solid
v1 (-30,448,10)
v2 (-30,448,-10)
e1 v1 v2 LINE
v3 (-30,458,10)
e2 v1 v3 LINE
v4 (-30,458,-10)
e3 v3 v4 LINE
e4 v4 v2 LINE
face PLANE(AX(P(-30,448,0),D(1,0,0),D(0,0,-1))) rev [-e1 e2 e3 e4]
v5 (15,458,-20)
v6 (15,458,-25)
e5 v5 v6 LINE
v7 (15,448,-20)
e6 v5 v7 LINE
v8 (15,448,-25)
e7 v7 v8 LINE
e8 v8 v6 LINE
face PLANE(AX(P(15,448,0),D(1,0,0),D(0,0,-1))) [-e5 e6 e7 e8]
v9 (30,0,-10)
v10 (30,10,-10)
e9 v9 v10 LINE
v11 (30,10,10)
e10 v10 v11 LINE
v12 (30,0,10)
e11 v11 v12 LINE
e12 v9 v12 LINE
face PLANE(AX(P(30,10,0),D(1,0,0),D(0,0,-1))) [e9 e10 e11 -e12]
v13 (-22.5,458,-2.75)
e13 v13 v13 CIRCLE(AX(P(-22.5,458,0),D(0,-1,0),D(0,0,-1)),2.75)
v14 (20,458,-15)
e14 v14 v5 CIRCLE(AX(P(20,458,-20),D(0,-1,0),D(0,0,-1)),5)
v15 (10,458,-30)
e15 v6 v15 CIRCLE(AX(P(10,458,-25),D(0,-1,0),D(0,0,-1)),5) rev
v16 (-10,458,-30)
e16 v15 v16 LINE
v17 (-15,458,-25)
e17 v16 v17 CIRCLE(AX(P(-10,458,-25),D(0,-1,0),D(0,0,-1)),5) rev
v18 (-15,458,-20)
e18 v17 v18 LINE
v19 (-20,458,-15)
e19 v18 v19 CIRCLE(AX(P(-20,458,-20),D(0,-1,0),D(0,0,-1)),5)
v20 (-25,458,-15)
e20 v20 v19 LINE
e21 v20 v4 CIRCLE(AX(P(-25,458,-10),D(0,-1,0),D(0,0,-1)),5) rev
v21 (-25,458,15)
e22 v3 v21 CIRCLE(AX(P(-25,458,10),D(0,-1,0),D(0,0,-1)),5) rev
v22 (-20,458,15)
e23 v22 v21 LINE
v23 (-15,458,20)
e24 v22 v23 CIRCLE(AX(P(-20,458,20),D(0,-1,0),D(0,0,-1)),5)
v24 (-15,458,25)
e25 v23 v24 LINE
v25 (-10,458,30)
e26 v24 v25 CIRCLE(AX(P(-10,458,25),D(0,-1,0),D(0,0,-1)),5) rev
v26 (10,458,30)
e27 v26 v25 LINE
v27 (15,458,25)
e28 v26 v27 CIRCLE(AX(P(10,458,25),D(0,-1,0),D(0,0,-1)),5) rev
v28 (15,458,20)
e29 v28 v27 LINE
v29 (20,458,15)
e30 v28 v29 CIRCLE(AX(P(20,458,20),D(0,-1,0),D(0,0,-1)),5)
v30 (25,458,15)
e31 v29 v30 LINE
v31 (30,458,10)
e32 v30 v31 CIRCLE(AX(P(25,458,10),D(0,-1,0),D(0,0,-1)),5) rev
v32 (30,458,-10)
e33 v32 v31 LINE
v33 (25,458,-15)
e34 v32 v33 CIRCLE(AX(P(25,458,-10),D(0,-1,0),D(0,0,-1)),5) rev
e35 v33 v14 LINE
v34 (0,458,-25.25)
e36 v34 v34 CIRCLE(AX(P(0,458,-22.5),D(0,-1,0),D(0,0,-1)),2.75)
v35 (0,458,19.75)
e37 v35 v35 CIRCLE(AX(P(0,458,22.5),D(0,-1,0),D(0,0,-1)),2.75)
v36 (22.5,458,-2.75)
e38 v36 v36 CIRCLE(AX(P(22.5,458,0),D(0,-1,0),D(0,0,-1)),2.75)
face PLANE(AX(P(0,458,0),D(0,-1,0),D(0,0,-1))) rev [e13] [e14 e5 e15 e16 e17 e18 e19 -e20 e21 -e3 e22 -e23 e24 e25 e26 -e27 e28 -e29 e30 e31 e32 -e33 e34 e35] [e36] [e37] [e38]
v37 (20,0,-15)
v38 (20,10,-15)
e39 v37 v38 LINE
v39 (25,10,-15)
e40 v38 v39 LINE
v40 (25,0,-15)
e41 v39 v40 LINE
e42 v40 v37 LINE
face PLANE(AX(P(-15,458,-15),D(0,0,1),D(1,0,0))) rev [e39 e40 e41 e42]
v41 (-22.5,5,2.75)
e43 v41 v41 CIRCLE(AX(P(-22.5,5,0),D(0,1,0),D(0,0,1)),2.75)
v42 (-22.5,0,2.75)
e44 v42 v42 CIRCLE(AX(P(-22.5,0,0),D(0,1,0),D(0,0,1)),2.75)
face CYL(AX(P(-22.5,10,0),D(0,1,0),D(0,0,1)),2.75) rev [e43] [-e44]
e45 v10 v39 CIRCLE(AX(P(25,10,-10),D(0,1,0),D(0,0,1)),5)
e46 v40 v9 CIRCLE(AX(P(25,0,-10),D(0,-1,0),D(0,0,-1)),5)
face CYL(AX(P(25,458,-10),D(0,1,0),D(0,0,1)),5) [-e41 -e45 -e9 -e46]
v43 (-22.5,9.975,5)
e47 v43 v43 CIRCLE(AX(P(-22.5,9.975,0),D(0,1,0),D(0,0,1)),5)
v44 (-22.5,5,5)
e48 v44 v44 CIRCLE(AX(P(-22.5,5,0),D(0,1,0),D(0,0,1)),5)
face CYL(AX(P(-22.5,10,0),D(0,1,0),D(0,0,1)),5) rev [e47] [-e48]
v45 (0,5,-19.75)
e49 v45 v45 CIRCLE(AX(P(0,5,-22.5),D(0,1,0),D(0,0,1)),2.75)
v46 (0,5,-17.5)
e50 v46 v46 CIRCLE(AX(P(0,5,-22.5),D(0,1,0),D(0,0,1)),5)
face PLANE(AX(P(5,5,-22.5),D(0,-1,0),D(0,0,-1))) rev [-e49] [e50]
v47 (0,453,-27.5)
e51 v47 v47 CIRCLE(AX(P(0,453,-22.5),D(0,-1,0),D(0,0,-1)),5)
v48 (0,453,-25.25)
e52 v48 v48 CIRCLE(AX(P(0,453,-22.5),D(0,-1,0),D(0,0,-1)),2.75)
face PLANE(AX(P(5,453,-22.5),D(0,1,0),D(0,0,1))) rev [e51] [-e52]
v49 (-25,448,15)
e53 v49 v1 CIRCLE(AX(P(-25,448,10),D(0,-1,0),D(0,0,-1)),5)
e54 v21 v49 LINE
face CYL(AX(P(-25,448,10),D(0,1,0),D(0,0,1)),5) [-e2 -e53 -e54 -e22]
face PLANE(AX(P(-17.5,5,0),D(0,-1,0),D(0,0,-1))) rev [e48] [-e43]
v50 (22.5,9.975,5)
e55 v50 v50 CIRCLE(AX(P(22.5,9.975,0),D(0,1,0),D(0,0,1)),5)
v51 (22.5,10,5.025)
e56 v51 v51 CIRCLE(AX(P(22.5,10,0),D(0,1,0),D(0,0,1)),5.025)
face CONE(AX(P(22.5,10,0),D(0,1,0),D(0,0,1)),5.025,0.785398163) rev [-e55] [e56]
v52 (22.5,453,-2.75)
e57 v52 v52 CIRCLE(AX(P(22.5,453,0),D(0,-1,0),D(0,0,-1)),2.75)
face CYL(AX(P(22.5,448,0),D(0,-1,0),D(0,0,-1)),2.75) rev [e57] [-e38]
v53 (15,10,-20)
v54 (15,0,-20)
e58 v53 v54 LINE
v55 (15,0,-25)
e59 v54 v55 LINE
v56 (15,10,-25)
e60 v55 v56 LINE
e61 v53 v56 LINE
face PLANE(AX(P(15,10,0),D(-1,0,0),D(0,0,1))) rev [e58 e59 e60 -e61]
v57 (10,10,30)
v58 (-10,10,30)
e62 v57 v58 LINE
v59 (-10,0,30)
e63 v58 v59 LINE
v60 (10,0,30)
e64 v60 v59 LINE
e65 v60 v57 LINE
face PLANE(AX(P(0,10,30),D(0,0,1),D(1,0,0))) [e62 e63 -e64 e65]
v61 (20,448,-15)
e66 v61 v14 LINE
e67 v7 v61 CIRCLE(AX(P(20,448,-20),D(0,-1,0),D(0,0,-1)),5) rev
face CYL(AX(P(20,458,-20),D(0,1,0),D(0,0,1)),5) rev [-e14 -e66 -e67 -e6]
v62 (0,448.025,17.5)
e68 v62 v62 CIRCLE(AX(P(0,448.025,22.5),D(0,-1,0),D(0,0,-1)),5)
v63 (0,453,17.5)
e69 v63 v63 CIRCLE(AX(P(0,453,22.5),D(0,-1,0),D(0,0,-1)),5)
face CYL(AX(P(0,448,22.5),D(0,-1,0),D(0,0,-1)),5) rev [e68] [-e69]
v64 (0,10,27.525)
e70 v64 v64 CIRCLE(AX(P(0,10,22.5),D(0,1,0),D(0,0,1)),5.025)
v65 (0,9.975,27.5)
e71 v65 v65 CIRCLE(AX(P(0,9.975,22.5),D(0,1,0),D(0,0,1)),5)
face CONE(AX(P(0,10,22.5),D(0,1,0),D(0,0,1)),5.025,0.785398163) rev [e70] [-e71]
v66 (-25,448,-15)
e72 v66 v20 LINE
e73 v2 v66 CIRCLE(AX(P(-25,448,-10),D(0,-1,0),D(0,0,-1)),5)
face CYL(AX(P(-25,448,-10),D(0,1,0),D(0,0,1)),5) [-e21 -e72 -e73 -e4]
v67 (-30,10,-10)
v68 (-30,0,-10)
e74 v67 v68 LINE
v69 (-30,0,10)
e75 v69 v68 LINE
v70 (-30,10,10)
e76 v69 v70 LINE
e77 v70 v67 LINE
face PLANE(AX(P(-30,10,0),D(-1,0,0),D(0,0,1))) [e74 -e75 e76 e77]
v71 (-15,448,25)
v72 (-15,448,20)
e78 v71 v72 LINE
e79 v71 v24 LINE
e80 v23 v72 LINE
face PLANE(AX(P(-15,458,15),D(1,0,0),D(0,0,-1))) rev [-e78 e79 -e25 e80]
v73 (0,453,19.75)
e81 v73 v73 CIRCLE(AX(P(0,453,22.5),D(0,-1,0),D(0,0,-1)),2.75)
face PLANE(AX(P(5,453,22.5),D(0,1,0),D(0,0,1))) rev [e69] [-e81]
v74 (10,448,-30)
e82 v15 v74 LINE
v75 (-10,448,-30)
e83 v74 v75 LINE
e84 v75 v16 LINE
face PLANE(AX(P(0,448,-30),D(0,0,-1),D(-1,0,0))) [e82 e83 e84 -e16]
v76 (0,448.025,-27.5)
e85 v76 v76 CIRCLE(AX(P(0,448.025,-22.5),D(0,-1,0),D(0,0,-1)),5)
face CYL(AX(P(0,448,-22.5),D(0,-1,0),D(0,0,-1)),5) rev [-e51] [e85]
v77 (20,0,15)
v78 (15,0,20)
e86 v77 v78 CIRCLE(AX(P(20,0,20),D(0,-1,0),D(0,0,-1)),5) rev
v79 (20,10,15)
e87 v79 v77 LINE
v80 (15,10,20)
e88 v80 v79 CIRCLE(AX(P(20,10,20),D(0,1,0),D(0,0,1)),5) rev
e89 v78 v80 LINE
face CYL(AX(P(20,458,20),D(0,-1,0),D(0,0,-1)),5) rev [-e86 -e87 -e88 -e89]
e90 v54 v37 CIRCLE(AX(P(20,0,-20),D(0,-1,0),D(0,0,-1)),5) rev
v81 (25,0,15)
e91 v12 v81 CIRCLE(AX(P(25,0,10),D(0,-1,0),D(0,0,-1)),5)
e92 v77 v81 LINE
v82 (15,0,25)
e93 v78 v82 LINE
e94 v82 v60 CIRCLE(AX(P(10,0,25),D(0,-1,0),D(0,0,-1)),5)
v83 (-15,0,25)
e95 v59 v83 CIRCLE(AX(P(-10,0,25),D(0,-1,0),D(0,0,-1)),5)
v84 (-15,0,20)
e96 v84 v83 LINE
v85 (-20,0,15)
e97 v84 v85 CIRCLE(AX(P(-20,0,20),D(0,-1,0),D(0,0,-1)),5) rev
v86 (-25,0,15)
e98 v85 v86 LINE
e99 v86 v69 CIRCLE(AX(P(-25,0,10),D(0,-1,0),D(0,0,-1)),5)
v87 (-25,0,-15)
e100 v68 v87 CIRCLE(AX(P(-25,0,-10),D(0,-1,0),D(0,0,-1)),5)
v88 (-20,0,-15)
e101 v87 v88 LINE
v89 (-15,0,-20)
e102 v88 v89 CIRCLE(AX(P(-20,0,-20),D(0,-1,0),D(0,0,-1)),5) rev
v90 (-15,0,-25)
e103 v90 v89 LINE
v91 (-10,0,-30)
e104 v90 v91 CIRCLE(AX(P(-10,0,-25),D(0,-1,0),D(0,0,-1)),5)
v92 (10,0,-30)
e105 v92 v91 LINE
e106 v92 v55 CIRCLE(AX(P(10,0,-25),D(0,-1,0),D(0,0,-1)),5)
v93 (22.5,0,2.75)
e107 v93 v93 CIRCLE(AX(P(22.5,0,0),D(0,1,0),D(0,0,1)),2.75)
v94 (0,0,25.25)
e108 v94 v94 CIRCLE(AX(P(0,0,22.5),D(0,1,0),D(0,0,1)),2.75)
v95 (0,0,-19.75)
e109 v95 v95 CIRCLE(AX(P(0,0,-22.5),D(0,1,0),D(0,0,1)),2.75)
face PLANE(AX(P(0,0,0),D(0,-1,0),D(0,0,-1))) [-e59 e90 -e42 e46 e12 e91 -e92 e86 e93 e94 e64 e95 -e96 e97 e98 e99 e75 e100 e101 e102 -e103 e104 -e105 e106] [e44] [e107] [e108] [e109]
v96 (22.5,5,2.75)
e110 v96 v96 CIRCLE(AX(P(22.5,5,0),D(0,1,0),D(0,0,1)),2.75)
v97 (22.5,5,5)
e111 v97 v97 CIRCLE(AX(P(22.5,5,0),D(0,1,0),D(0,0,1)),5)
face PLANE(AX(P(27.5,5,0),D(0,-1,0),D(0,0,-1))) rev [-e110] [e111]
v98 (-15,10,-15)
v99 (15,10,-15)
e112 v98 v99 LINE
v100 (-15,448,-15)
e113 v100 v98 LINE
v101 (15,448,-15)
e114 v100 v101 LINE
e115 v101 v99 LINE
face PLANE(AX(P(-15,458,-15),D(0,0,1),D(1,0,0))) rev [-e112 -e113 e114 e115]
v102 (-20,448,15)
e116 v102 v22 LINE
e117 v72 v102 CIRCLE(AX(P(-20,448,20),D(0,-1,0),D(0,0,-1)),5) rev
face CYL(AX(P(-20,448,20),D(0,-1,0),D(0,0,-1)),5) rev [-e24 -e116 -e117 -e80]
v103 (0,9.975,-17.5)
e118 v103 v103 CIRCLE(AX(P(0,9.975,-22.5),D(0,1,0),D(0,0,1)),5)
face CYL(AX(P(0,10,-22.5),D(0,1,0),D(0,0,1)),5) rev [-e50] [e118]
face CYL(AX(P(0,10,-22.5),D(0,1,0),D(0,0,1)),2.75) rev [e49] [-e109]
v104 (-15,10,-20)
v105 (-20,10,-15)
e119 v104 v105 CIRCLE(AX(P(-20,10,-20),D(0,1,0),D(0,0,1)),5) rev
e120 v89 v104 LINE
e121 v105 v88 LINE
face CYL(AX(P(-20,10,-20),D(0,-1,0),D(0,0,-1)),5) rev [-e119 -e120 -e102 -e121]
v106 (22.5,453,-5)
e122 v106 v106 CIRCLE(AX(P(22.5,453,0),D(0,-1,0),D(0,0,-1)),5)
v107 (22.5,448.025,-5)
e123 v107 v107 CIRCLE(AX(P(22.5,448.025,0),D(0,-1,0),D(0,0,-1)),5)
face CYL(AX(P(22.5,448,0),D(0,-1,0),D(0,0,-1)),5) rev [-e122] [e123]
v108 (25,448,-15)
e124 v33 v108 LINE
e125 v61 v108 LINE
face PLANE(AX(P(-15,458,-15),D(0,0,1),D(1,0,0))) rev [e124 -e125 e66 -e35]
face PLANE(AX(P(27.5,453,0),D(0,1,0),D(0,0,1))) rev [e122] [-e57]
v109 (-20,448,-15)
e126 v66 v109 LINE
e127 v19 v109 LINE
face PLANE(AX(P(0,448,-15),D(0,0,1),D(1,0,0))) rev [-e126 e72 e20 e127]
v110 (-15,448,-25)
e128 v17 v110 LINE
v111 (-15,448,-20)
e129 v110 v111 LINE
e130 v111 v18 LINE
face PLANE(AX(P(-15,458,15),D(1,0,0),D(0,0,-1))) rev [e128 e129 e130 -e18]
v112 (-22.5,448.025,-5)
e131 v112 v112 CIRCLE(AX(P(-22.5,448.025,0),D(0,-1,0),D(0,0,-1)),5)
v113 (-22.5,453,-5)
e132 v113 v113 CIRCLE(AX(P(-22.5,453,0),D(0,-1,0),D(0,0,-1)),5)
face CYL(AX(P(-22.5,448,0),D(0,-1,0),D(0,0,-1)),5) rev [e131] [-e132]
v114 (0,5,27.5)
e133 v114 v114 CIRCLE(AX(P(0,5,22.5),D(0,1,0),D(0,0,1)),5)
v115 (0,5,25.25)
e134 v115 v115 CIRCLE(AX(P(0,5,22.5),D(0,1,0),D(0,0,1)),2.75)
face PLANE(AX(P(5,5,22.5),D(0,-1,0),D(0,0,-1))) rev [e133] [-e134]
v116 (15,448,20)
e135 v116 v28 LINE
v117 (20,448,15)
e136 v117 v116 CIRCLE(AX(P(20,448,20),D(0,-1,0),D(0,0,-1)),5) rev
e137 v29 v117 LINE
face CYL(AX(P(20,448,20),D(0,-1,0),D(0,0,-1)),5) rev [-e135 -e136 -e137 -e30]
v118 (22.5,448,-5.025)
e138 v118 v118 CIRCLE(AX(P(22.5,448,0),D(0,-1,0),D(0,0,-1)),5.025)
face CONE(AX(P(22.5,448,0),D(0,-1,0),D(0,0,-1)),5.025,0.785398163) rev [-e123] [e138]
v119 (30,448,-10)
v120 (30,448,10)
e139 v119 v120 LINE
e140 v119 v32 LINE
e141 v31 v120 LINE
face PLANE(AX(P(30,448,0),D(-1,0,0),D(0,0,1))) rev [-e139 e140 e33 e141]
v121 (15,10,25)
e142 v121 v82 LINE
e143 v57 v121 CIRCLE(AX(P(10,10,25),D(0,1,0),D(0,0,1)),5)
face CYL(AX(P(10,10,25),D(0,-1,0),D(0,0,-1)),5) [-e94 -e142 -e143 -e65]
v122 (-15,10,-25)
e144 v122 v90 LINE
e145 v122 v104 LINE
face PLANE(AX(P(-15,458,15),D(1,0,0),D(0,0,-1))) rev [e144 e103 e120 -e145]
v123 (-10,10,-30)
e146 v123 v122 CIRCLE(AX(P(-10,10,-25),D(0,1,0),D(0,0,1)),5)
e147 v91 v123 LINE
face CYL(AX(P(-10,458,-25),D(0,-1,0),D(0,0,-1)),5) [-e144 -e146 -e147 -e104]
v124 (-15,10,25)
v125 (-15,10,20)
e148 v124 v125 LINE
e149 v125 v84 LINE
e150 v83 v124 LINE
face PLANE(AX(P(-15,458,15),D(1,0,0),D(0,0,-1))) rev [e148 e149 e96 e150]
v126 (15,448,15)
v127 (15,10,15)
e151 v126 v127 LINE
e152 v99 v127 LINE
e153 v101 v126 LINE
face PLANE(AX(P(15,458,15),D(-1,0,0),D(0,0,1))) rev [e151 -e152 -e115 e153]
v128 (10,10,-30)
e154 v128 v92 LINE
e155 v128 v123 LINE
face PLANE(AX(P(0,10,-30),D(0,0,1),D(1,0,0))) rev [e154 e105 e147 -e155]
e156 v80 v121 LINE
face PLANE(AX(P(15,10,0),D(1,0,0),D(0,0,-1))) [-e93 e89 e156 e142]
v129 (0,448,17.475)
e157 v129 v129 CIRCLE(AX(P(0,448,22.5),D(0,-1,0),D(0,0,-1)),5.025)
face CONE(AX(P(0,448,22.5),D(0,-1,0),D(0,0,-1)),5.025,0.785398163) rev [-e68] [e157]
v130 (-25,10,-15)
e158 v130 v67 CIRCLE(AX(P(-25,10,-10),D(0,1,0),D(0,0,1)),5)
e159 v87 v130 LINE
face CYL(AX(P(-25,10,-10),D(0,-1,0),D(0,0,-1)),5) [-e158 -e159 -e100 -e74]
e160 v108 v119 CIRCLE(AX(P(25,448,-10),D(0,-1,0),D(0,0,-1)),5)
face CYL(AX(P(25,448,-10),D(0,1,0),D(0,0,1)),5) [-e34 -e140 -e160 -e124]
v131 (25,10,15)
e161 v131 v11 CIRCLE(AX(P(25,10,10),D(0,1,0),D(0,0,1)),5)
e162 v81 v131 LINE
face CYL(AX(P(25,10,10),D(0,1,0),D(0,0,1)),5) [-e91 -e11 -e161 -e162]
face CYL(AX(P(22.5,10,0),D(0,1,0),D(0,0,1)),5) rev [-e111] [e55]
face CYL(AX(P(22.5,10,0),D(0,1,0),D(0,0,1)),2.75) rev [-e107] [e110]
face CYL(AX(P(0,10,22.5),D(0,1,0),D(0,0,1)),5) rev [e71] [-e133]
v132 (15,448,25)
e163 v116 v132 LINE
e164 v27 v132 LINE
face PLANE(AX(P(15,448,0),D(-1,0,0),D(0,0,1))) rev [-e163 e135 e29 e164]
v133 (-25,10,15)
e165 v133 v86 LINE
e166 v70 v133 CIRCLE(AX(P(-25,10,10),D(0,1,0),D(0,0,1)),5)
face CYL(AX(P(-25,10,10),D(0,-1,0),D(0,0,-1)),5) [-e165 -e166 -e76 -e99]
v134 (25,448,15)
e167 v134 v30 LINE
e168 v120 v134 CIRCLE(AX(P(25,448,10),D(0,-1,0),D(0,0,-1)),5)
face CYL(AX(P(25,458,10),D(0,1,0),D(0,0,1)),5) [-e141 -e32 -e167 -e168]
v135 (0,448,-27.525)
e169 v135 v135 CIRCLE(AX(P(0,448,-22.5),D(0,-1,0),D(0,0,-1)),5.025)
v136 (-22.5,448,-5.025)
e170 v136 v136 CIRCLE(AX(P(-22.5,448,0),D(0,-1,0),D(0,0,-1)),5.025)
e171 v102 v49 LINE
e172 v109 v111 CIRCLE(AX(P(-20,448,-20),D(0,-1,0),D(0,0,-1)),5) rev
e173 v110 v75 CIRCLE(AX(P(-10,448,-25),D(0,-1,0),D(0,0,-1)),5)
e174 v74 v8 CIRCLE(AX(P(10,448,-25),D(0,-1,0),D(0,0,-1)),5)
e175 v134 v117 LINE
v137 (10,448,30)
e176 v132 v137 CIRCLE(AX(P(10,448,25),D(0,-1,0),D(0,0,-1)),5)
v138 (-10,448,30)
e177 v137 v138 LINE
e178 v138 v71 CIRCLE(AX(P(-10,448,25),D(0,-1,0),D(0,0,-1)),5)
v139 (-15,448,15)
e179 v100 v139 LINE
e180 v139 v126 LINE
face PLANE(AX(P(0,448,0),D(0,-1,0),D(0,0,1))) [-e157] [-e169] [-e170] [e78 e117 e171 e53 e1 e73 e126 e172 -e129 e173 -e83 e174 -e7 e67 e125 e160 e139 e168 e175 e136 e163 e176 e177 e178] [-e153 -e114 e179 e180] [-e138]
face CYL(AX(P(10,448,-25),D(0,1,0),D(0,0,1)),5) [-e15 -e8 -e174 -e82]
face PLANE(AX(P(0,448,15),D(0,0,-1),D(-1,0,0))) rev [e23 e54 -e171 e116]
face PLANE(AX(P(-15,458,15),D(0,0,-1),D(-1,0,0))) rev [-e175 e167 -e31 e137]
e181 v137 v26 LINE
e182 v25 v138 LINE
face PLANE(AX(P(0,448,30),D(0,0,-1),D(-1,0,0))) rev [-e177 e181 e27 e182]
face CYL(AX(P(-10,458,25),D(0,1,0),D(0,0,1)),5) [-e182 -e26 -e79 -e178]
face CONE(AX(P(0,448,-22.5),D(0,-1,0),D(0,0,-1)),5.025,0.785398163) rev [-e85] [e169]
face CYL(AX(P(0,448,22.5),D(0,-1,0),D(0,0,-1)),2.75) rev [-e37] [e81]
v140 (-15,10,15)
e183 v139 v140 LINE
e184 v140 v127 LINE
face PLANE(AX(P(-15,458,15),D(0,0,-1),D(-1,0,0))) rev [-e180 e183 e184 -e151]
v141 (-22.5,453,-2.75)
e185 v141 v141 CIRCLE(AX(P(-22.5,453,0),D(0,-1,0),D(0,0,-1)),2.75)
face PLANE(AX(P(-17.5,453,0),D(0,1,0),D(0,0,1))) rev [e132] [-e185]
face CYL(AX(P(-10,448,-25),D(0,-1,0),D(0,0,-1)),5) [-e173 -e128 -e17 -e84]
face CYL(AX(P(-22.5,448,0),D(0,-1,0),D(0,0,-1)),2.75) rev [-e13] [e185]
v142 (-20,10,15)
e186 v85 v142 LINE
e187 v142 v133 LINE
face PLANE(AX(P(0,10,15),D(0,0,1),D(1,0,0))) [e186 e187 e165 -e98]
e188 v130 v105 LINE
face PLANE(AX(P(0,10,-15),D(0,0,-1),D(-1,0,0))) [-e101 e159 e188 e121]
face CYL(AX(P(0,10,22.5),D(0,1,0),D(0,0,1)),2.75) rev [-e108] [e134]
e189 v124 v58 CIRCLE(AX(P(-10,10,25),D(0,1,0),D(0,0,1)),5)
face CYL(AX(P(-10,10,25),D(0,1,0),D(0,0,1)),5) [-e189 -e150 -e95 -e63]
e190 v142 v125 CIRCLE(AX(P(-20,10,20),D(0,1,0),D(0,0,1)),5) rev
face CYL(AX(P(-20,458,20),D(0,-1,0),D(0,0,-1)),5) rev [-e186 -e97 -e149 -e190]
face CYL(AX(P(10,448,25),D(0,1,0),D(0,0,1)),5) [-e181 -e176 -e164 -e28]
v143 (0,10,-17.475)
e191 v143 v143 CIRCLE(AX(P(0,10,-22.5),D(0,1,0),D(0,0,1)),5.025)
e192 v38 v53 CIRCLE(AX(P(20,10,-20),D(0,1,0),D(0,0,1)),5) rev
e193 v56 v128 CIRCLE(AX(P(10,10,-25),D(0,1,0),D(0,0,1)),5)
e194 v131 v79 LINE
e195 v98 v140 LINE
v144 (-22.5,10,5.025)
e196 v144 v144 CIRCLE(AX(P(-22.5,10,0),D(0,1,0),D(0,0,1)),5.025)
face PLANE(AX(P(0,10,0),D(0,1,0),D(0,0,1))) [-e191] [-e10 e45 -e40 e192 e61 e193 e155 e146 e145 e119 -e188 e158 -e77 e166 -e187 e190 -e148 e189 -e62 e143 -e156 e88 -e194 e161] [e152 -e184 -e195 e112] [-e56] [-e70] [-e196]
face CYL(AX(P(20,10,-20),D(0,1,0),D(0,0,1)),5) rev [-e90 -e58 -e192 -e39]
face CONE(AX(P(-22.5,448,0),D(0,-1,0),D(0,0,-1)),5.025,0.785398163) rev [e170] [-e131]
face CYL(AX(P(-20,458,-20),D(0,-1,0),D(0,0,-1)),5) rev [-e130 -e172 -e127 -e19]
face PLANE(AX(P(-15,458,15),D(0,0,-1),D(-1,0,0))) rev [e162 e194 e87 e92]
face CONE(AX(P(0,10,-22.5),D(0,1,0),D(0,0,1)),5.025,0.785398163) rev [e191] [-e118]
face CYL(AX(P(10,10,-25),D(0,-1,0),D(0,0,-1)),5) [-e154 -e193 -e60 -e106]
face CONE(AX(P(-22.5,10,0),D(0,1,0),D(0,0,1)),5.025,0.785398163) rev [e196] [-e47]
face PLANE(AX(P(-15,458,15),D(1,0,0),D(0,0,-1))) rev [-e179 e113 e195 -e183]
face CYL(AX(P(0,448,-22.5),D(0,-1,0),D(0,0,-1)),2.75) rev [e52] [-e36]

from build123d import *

# Parameters (mm, degrees)
SKETCH1_W                     = 30
SKETCH1_H                     = 30
BOSS_EXTRUDE1_DEPTH           = 458
SKETCH2_W                     = 15
SKETCH2_H                     = 30
SKETCH2_W_2                   = 30
SKETCH2_H_2                   = 15
BOSS_EXTRUDE2_DEPTH           = 10
CBORE_FOR_M5_SHCS1_AT_2_COUNT = 2
CBORE_FOR_M5_SHCS1_AT_2_PITCH = 45
CBORE_FOR_M5_SHCS1_AT_3_COUNT = 2
CBORE_FOR_M5_SHCS1_AT_3_PITCH = 31.819805153
CBORE_FOR_M5_SHCS1_AT_4_COUNT = 2
CBORE_FOR_M5_SHCS1_AT_4_PITCH = 31.819805153
FILLET1_R                     = 5
FILLET1_OF_MIRROR1_R          = 5


with BuildPart() as part:
    # Sketch1 → Boss-Extrude1 (new body)
    with BuildSketch(Plane(origin=(0, 0, 0), x_dir=(1, 0, 0), z_dir=(0, 1, 0))):
        Rectangle(SKETCH1_W, SKETCH1_H)
    extrude(amount=BOSS_EXTRUDE1_DEPTH)

    # Sketch2 → Boss-Extrude2 (add)
    with BuildSketch(Plane(origin=(0, 0, 0), x_dir=(1, 0, 0), z_dir=(0, 1, 0))):
        with Locations((22.5, 0)):
            Rectangle(SKETCH2_W, SKETCH2_H)
        with Locations((0, -22.5)):
            Rectangle(SKETCH2_W_2, SKETCH2_H_2)
        with Locations((0, 22.5)):
            Rectangle(SKETCH2_W_2, SKETCH2_H_2)
        with Locations((-22.5, 0)):
            Rectangle(SKETCH2_W, SKETCH2_H)
    boss_extrude2 = extrude(amount=BOSS_EXTRUDE2_DEPTH)

    # Sketch4 → CBORE for M5 SHCS1 (revolve, cut)
    with BuildSketch(Plane(origin=(-22.5, 10, 0), x_dir=(0, 0, 1), z_dir=(1, 0, 0))):
        Polygon((0, 0), (0, 10), (2.75, 10), (2.75, 5), (5, 5), (5, 0.025), (5.025, 0), align=None)
    cbore_for_m5_shcs1 = revolve(axis=Axis((-22.5, 16.35, 0), (0, -1, 0)), mode=Mode.SUBTRACT)

    # CBORE for M5 SHCS1 at 2: CBORE for M5 SHCS1 ×2
    with Locations(*[(i * CBORE_FOR_M5_SHCS1_AT_2_PITCH, 0, 0) for i in range(1, CBORE_FOR_M5_SHCS1_AT_2_COUNT)]):
        add(cbore_for_m5_shcs1, mode=Mode.SUBTRACT)

    # CBORE for M5 SHCS1 at 3: CBORE for M5 SHCS1 ×2
    with Locations(*[Vector(0.7071067811865476, 0, -0.7071067811865476) * (i * CBORE_FOR_M5_SHCS1_AT_3_PITCH) for i in range(1, CBORE_FOR_M5_SHCS1_AT_3_COUNT)]):
        add(cbore_for_m5_shcs1, mode=Mode.SUBTRACT)

    # CBORE for M5 SHCS1 at 4: CBORE for M5 SHCS1 ×2
    with Locations(*[Vector(0.7071067811865476, 0, 0.7071067811865476) * (i * CBORE_FOR_M5_SHCS1_AT_4_PITCH) for i in range(1, CBORE_FOR_M5_SHCS1_AT_4_COUNT)]):
        add(cbore_for_m5_shcs1, mode=Mode.SUBTRACT)

    # Fillet1
    # the kernel refuses this fillet: 5 mm, written as the material it adds along each edge
    with BuildSketch(Plane(origin=(15, 0, 15), x_dir=(0, 0, 1), z_dir=(0, 1, 0)), Plane(origin=(15, 0, -15), x_dir=(1, 0, 0), z_dir=(0, 1, 0))) as fillet1_piece_1:
        with BuildLine():
            CenterArc((FILLET1_R, FILLET1_R), FILLET1_R, 180, 90)
            Line((0, FILLET1_R), (0, 0))
            Line((0, 0), (FILLET1_R, 0))
        make_face()
    extrude(amount=10)
    with BuildSketch(Plane(origin=(-15, 0, 15), x_dir=(0, 0, 1), z_dir=(0, 1, 0)), Plane(origin=(-15, 0, -15), x_dir=(-1, 0, 0), z_dir=(0, 1, 0))) as fillet1_piece_2:
        with BuildLine():
            CenterArc((FILLET1_R, -FILLET1_R), FILLET1_R, 90, 90)
            Line((0, -FILLET1_R), (0, 0))
            Line((0, 0), (FILLET1_R, 0))
        make_face()
    extrude(amount=10)
    # the kernel refuses this fillet: 5 mm, written as the material it takes off along each edge
    with BuildSketch(Plane(origin=(30, -12.5, 15), x_dir=(-1, 0, 0), z_dir=(0, 1, 0)), Plane(origin=(30, -12.5, -15), x_dir=(0, 0, 1), z_dir=(0, 1, 0)), Plane(origin=(-15, -12.5, 30), x_dir=(0, 0, -1), z_dir=(0, 1, 0)), Plane(origin=(15, -12.5, 30), x_dir=(-1, 0, 0), z_dir=(0, 1, 0)), Plane(origin=(-30, -12.5, -15), x_dir=(1, 0, 0), z_dir=(0, 1, 0))) as fillet1_2_piece_1:
        with BuildLine():
            CenterArc((FILLET1_R, -FILLET1_R), FILLET1_R, 90, 90)
            Line((0, -FILLET1_R), (0, 0))
            Line((0, 0), (FILLET1_R, 0))
        make_face()
    extrude(amount=35, mode=Mode.SUBTRACT)
    with BuildSketch(Plane(origin=(15, -12.5, -30), x_dir=(-1, 0, 0), z_dir=(0, 1, 0)), Plane(origin=(-15, -12.5, -30), x_dir=(0, 0, 1), z_dir=(0, 1, 0)), Plane(origin=(-30, -12.5, 15), x_dir=(1, 0, 0), z_dir=(0, 1, 0))) as fillet1_2_piece_2:
        with BuildLine():
            CenterArc((FILLET1_R, FILLET1_R), FILLET1_R, 180, 90)
            Line((0, FILLET1_R), (0, 0))
            Line((0, 0), (FILLET1_R, 0))
        make_face()
    extrude(amount=35, mode=Mode.SUBTRACT)

    # Mirror1: Boss-Extrude2, CBORE for M5 SHCS1 across plane
    add(boss_extrude2.mirror(Plane.ZX.offset(229)))
    add(cbore_for_m5_shcs1.mirror(Plane.ZX.offset(229)), mode=Mode.SUBTRACT)

    # Mirror1 copy 1 sketch → Mirror1 copy 1 (revolve, cut)
    with BuildSketch(Plane(origin=(22.5, 448, 0), x_dir=(0, 0, 1), z_dir=(1, 0, 0))):
        Polygon((0, 0), (0, -10), (2.75, -10), (2.75, -5), (5, -5), (5, -0.025), (5.025, 0), align=None)
    revolve(axis=Axis((22.5, 441.65, 0), (0, -1, 0)), mode=Mode.SUBTRACT)

    # Mirror1 copy 2 sketch → Mirror1 copy 2 (revolve, cut)
    with BuildSketch(Plane(origin=(0, 448, -22.5), x_dir=(0, 0, 1), z_dir=(1, 0, 0))):
        Polygon((0, 0), (0, -10), (2.75, -10), (2.75, -5), (5, -5), (5, -0.025), (5.025, 0), align=None)
    revolve(axis=Axis((0, 441.65, -22.5), (0, -1, 0)), mode=Mode.SUBTRACT)

    # Mirror1 copy 3 sketch → Mirror1 copy 3 (revolve, cut)
    with BuildSketch(Plane(origin=(0, 448, 22.5), x_dir=(0, 0, 1), z_dir=(1, 0, 0))):
        Polygon((0, 0), (0, -10), (2.75, -10), (2.75, -5), (5, -5), (5, -0.025), (5.025, 0), align=None)
    revolve(axis=Axis((0, 441.65, 22.5), (0, -1, 0)), mode=Mode.SUBTRACT)

    # Fillet1 of Mirror1
    # the kernel refuses this fillet: 5 mm, written as the material it adds along each edge
    with BuildSketch(Plane(origin=(15, 448, 15), x_dir=(0, 0, 1), z_dir=(0, 1, 0)), Plane(origin=(-15, 448, 15), x_dir=(-1, 0, 0), z_dir=(0, 1, 0))) as fillet1_of_mirror1_piece_1:
        with BuildLine():
            CenterArc((FILLET1_OF_MIRROR1_R, FILLET1_OF_MIRROR1_R), FILLET1_OF_MIRROR1_R, 180, 90)
            Line((0, FILLET1_OF_MIRROR1_R), (0, 0))
            Line((0, 0), (FILLET1_OF_MIRROR1_R, 0))
        make_face()
    extrude(amount=10)
    with BuildSketch(Plane(origin=(15, 448, -15), x_dir=(0, 0, -1), z_dir=(0, 1, 0)), Plane(origin=(-15, 448, -15), x_dir=(-1, 0, 0), z_dir=(0, 1, 0))) as fillet1_of_mirror1_piece_2:
        with BuildLine():
            CenterArc((FILLET1_OF_MIRROR1_R, -FILLET1_OF_MIRROR1_R), FILLET1_OF_MIRROR1_R, 90, 90)
            Line((0, -FILLET1_OF_MIRROR1_R), (0, 0))
            Line((0, 0), (FILLET1_OF_MIRROR1_R, 0))
        make_face()
    extrude(amount=10)
    # the kernel refuses this fillet: 5 mm, written as the material it takes off along each edge
    with BuildSketch(Plane(origin=(30, 470.5, 15), x_dir=(-1, 0, 0), z_dir=(0, -1, 0)), Plane(origin=(30, 470.5, -15), x_dir=(0, 0, 1), z_dir=(0, -1, 0)), Plane(origin=(-15, 470.5, 30), x_dir=(0, 0, -1), z_dir=(0, -1, 0)), Plane(origin=(15, 470.5, 30), x_dir=(-1, 0, 0), z_dir=(0, -1, 0)), Plane(origin=(-15, 470.5, -30), x_dir=(1, 0, 0), z_dir=(0, -1, 0)), Plane(origin=(-30, 470.5, -15), x_dir=(1, 0, 0), z_dir=(0, -1, 0))) as fillet1_of_mirror1_2_piece_1:
        with BuildLine():
            CenterArc((FILLET1_OF_MIRROR1_R, FILLET1_OF_MIRROR1_R), FILLET1_OF_MIRROR1_R, 180, 90)
            Line((0, FILLET1_OF_MIRROR1_R), (0, 0))
            Line((0, 0), (FILLET1_OF_MIRROR1_R, 0))
        make_face()
    extrude(amount=35, mode=Mode.SUBTRACT)
    with BuildSketch(Plane(origin=(15, 470.5, -30), x_dir=(-1, 0, 0), z_dir=(0, -1, 0)), Plane(origin=(-30, 470.5, 15), x_dir=(1, 0, 0), z_dir=(0, -1, 0))) as fillet1_of_mirror1_2_piece_2:
        with BuildLine():
            CenterArc((FILLET1_OF_MIRROR1_R, -FILLET1_OF_MIRROR1_R), FILLET1_OF_MIRROR1_R, 90, 90)
            Line((0, -FILLET1_OF_MIRROR1_R), (0, 0))
            Line((0, 0), (FILLET1_OF_MIRROR1_R, 0))
        make_face()
    extrude(amount=35, mode=Mode.SUBTRACT)


solid = part.part
